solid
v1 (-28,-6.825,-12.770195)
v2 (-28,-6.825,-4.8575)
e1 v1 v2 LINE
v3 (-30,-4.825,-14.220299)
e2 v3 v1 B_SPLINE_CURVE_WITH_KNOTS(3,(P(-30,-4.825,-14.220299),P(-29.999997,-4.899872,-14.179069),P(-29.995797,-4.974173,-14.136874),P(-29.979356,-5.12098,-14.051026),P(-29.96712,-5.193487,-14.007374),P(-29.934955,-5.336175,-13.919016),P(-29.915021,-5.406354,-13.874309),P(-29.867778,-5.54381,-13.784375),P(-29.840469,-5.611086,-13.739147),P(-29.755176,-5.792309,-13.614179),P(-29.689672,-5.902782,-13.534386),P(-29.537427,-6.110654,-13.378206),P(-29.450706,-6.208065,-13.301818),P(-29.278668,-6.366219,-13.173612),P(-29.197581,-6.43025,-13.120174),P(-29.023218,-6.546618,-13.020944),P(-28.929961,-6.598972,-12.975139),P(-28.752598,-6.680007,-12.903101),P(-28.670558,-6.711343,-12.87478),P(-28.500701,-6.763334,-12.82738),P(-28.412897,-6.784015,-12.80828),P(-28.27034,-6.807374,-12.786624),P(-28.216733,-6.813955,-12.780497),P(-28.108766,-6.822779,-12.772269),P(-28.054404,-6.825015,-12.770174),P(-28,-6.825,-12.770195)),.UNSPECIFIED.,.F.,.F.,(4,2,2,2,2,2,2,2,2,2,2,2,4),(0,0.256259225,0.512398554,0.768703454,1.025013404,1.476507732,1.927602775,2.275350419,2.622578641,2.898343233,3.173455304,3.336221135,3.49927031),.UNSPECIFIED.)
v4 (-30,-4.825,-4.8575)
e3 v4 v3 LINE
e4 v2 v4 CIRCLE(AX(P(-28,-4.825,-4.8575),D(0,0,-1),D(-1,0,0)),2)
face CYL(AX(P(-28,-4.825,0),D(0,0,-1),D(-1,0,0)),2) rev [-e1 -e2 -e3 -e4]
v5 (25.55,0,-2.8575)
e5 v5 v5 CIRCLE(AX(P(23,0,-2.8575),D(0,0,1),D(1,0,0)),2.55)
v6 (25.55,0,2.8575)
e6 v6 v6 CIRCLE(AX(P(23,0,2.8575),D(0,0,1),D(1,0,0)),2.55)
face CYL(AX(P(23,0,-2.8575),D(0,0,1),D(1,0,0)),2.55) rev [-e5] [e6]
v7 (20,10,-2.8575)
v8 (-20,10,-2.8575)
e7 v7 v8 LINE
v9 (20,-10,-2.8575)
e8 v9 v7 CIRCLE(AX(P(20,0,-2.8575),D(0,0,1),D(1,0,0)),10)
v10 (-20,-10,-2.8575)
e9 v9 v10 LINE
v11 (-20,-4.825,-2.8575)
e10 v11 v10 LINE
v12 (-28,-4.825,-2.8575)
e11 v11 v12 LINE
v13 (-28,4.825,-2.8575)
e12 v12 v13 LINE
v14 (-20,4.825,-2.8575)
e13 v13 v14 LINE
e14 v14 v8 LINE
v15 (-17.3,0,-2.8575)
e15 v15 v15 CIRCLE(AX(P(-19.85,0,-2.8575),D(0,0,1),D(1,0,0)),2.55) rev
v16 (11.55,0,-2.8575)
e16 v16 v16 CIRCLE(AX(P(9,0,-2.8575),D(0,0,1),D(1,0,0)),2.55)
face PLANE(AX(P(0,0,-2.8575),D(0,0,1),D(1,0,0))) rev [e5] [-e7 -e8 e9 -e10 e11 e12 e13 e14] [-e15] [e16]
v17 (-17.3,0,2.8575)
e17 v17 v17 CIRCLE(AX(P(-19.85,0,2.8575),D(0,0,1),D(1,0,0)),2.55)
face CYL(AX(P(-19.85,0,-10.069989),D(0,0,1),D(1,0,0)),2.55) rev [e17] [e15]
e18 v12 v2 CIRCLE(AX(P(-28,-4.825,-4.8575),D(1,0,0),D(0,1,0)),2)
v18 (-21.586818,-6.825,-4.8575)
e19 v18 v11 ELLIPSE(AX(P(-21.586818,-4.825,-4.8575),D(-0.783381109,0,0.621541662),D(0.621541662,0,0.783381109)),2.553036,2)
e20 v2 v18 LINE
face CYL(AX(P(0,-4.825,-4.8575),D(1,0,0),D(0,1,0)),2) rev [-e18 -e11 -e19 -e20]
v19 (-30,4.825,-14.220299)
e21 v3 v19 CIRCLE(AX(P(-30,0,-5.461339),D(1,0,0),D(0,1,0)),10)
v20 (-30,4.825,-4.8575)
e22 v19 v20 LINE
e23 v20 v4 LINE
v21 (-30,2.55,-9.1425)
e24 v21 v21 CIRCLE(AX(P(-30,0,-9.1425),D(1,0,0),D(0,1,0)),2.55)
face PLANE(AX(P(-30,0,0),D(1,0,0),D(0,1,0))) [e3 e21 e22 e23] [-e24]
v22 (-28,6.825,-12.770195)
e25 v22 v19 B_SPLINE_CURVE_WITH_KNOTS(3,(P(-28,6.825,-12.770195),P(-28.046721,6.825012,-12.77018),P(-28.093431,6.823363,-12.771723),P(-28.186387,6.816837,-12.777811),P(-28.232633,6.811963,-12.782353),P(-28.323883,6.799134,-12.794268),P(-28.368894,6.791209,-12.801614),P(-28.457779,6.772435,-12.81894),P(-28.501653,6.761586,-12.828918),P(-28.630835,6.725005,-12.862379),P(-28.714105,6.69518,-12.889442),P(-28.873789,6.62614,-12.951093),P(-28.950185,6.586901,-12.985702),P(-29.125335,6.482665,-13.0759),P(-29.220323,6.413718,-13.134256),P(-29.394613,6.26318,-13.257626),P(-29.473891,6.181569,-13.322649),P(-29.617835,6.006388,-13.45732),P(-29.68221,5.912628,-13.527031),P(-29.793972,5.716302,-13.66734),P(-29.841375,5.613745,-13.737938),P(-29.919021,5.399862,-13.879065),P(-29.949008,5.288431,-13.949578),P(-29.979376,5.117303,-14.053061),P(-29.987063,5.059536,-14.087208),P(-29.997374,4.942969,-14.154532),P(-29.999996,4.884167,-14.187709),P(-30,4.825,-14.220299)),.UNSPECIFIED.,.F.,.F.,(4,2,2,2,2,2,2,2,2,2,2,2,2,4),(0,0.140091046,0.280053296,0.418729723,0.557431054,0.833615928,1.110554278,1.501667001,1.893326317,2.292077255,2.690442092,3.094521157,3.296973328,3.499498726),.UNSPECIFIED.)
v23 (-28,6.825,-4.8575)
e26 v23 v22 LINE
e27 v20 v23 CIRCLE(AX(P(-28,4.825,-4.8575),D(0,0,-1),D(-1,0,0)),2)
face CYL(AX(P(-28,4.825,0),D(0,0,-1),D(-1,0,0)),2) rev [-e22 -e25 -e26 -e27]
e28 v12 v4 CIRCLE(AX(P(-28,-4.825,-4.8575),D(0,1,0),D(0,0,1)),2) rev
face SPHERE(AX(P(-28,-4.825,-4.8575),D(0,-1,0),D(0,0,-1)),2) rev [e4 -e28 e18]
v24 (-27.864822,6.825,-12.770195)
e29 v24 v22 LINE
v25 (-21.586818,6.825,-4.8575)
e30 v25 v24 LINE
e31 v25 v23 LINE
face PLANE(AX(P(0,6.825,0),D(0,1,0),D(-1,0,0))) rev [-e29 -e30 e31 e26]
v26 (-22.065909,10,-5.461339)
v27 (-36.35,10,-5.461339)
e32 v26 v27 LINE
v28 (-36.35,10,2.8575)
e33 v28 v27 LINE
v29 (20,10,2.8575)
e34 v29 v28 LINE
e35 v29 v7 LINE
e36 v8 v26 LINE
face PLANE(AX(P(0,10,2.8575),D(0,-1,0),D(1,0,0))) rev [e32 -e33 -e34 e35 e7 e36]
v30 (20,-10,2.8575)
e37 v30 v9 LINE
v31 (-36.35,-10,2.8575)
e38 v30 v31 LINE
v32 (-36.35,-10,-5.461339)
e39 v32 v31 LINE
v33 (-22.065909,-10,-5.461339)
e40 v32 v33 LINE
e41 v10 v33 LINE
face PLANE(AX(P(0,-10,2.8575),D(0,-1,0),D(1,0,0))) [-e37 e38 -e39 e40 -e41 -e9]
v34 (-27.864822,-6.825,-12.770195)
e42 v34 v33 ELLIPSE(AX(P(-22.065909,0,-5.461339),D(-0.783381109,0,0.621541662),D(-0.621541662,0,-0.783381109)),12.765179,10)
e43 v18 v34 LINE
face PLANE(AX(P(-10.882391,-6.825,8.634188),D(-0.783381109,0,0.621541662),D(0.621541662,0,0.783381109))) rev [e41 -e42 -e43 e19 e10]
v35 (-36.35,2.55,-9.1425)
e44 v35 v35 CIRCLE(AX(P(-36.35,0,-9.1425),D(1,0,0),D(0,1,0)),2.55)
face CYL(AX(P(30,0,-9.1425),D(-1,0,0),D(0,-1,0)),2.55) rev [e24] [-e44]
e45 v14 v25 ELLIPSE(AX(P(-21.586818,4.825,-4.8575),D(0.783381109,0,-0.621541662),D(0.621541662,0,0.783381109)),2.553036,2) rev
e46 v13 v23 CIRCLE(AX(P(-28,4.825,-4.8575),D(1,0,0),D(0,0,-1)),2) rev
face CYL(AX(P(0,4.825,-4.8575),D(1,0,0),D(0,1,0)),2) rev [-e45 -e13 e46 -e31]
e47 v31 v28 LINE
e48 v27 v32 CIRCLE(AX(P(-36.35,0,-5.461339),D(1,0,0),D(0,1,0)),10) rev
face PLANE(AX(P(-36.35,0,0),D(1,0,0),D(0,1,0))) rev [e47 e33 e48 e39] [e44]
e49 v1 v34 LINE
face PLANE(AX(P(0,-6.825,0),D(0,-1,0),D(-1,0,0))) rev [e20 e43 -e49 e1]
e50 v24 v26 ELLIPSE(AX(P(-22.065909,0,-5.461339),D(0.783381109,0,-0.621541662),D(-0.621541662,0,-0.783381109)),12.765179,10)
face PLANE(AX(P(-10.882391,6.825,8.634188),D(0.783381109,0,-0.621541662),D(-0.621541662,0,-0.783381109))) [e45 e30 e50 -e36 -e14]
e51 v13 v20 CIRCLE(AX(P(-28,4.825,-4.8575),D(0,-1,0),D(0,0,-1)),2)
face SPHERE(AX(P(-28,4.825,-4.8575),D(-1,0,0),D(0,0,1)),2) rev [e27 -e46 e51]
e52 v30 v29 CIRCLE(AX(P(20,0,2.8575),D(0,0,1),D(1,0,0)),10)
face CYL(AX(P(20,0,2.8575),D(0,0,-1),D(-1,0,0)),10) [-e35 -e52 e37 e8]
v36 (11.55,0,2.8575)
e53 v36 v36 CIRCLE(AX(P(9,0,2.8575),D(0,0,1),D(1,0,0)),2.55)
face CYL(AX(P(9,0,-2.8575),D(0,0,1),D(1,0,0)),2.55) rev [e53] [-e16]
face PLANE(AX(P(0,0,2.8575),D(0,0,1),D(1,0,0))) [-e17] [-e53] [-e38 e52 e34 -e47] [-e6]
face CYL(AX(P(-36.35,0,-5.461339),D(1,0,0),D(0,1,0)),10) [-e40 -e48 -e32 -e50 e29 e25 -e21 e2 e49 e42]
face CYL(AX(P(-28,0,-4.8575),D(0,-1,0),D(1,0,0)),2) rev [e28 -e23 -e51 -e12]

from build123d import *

# Parameters (mm, degrees)
BOSS_EXTRUDE1_DEPTH     = 2.8575
CUT_EXTRUDE1_DEPTH      = 33.135046678
CUT_EXTRUDE1_DEPTH_BACK = 33.135046678
SKETCH3_R               = 2.55
SKETCH4_R               = 2.55
CUT_EXTRUDE2_DEPTH      = 5.715
SKETCH5_W               = 18.318839082
SKETCH5_H               = 20
BOSS_EXTRUDE2_DEPTH     = 6.35
FILLET1_R               = 10
CUT_EXTRUDE3_DEPTH      = 69.857646679
CUT_EXTRUDE3_DEPTH_BACK = 69.857646679
SKETCH6_R               = 2.55
BOSS_EXTRUDE3_DEPTH     = 3.175
CUT_EXTRUDE4_DEPTH      = 69.857646679
CUT_EXTRUDE4_DEPTH_BACK = 69.857646679
FILLET2_R               = 2


with BuildPart() as part:
    # Sketch2 → Boss-Extrude1 (new, symmetric)
    with BuildSketch(Plane.XY):
        with BuildLine():
            Line((-30, 10), (-30, -10))
            Line((-30, -10), (20, -10))
            ThreePointArc((20, -10), (30, 0), (20, 10))
            Line((20, 10), (-30, 10))
        make_face()
    extrude(amount=BOSS_EXTRUDE1_DEPTH, both=True)

    # Sketch3 → Cut-Extrude1 (cut, two sides: drawn at the far end of the back side and taken through both)
    with BuildSketch(Plane.XY.offset(2.8575).offset(-CUT_EXTRUDE1_DEPTH_BACK)):
        with Locations((9, 0)):
            Circle(SKETCH3_R)
        with Locations((23, 0)):
            Circle(SKETCH3_R)
    extrude(amount=CUT_EXTRUDE1_DEPTH + CUT_EXTRUDE1_DEPTH_BACK, mode=Mode.SUBTRACT)

    # Sketch4 → Cut-Extrude2 (cut)
    with BuildSketch(Plane.XY.offset(2.8575)):
        with Locations((-19.85, 0)):
            Circle(SKETCH4_R)
    extrude(amount=-CUT_EXTRUDE2_DEPTH, mode=Mode.SUBTRACT)

    # Sketch5 → Boss-Extrude2 (add)
    with BuildSketch(Plane.ZY.offset(30)):
        with Locations((-6.301919541, 0)):
            Rectangle(SKETCH5_W, SKETCH5_H)
    extrude(amount=BOSS_EXTRUDE2_DEPTH)

    # Fillet1
    fillet1_edges = [part.edges().sort_by_distance(p)[0] for p in [
        (-33.175, -10, -15.461339082),
        (-33.175, 10, -15.461339082),
    ]]
    fillet(fillet1_edges, radius=FILLET1_R - 0.0001)  # a hair under: the kernel refuses the full size

    # Sketch6 → Cut-Extrude3 (cut, two sides: drawn at the far end of the back side and taken through both)
    with BuildSketch(Plane.ZY.offset(36.35).offset(-CUT_EXTRUDE3_DEPTH_BACK)):
        with Locations(Location((-9.1425, 0, 0), (0, 0, 90))):
            Circle(SKETCH6_R)
    extrude(amount=CUT_EXTRUDE3_DEPTH + CUT_EXTRUDE3_DEPTH_BACK, mode=Mode.SUBTRACT)

    # Sketch7 → Boss-Extrude3 (add)
    with BuildSketch(Plane(origin=(0, 10, 0), x_dir=(1, 0, 0), z_dir=(0, 1, 0))):
        Polygon((-30, 2.8575), (-20, 2.8575), (-30, 15.461339082), (-30, 5.461339082), align=None)
    boss_extrude3 = extrude(amount=-BOSS_EXTRUDE3_DEPTH)

    # Mirror1: Boss-Extrude3 across plane
    add(boss_extrude3.mirror(Plane.ZX))

    # Sketch8 → Cut-Extrude4 (cut, two sides: drawn at the far end of the back side and taken through both)
    with BuildSketch(Plane.ZY.offset(36.35).offset(-CUT_EXTRUDE4_DEPTH_BACK)):
        with BuildLine():
            ThreePointArc((-15.461339082, 0), (-12.532406894, 7.071067812), (-5.461339082, 10))
            Line((-5.461339082, 10), (-15.461339082, 10))
            Line((-15.461339082, 10), (-15.461339082, 0))
        make_face()
        with BuildLine():
            Line((-15.461339082, -10), (-5.461339082, -10))
            ThreePointArc((-5.461339082, -10), (-12.532406894, -7.071067812), (-15.461339082, 0))
            Line((-15.461339082, 0), (-15.461339082, -10))
        make_face()
    extrude(amount=CUT_EXTRUDE4_DEPTH + CUT_EXTRUDE4_DEPTH_BACK, mode=Mode.SUBTRACT)

    # Fillet2
    fillet2_edges = [part.edges().sort_by_distance(p)[0] for p in [
        (-30, 0, -2.8575),
        (-30, 6.825, -7.813847506),
        (-25, 6.825, -2.8575),
        (-30, -6.825, -7.813847506),
        (-25, -6.825, -2.8575),
    ]]
    fillet(fillet2_edges, radius=FILLET2_R)


solid = part.part
